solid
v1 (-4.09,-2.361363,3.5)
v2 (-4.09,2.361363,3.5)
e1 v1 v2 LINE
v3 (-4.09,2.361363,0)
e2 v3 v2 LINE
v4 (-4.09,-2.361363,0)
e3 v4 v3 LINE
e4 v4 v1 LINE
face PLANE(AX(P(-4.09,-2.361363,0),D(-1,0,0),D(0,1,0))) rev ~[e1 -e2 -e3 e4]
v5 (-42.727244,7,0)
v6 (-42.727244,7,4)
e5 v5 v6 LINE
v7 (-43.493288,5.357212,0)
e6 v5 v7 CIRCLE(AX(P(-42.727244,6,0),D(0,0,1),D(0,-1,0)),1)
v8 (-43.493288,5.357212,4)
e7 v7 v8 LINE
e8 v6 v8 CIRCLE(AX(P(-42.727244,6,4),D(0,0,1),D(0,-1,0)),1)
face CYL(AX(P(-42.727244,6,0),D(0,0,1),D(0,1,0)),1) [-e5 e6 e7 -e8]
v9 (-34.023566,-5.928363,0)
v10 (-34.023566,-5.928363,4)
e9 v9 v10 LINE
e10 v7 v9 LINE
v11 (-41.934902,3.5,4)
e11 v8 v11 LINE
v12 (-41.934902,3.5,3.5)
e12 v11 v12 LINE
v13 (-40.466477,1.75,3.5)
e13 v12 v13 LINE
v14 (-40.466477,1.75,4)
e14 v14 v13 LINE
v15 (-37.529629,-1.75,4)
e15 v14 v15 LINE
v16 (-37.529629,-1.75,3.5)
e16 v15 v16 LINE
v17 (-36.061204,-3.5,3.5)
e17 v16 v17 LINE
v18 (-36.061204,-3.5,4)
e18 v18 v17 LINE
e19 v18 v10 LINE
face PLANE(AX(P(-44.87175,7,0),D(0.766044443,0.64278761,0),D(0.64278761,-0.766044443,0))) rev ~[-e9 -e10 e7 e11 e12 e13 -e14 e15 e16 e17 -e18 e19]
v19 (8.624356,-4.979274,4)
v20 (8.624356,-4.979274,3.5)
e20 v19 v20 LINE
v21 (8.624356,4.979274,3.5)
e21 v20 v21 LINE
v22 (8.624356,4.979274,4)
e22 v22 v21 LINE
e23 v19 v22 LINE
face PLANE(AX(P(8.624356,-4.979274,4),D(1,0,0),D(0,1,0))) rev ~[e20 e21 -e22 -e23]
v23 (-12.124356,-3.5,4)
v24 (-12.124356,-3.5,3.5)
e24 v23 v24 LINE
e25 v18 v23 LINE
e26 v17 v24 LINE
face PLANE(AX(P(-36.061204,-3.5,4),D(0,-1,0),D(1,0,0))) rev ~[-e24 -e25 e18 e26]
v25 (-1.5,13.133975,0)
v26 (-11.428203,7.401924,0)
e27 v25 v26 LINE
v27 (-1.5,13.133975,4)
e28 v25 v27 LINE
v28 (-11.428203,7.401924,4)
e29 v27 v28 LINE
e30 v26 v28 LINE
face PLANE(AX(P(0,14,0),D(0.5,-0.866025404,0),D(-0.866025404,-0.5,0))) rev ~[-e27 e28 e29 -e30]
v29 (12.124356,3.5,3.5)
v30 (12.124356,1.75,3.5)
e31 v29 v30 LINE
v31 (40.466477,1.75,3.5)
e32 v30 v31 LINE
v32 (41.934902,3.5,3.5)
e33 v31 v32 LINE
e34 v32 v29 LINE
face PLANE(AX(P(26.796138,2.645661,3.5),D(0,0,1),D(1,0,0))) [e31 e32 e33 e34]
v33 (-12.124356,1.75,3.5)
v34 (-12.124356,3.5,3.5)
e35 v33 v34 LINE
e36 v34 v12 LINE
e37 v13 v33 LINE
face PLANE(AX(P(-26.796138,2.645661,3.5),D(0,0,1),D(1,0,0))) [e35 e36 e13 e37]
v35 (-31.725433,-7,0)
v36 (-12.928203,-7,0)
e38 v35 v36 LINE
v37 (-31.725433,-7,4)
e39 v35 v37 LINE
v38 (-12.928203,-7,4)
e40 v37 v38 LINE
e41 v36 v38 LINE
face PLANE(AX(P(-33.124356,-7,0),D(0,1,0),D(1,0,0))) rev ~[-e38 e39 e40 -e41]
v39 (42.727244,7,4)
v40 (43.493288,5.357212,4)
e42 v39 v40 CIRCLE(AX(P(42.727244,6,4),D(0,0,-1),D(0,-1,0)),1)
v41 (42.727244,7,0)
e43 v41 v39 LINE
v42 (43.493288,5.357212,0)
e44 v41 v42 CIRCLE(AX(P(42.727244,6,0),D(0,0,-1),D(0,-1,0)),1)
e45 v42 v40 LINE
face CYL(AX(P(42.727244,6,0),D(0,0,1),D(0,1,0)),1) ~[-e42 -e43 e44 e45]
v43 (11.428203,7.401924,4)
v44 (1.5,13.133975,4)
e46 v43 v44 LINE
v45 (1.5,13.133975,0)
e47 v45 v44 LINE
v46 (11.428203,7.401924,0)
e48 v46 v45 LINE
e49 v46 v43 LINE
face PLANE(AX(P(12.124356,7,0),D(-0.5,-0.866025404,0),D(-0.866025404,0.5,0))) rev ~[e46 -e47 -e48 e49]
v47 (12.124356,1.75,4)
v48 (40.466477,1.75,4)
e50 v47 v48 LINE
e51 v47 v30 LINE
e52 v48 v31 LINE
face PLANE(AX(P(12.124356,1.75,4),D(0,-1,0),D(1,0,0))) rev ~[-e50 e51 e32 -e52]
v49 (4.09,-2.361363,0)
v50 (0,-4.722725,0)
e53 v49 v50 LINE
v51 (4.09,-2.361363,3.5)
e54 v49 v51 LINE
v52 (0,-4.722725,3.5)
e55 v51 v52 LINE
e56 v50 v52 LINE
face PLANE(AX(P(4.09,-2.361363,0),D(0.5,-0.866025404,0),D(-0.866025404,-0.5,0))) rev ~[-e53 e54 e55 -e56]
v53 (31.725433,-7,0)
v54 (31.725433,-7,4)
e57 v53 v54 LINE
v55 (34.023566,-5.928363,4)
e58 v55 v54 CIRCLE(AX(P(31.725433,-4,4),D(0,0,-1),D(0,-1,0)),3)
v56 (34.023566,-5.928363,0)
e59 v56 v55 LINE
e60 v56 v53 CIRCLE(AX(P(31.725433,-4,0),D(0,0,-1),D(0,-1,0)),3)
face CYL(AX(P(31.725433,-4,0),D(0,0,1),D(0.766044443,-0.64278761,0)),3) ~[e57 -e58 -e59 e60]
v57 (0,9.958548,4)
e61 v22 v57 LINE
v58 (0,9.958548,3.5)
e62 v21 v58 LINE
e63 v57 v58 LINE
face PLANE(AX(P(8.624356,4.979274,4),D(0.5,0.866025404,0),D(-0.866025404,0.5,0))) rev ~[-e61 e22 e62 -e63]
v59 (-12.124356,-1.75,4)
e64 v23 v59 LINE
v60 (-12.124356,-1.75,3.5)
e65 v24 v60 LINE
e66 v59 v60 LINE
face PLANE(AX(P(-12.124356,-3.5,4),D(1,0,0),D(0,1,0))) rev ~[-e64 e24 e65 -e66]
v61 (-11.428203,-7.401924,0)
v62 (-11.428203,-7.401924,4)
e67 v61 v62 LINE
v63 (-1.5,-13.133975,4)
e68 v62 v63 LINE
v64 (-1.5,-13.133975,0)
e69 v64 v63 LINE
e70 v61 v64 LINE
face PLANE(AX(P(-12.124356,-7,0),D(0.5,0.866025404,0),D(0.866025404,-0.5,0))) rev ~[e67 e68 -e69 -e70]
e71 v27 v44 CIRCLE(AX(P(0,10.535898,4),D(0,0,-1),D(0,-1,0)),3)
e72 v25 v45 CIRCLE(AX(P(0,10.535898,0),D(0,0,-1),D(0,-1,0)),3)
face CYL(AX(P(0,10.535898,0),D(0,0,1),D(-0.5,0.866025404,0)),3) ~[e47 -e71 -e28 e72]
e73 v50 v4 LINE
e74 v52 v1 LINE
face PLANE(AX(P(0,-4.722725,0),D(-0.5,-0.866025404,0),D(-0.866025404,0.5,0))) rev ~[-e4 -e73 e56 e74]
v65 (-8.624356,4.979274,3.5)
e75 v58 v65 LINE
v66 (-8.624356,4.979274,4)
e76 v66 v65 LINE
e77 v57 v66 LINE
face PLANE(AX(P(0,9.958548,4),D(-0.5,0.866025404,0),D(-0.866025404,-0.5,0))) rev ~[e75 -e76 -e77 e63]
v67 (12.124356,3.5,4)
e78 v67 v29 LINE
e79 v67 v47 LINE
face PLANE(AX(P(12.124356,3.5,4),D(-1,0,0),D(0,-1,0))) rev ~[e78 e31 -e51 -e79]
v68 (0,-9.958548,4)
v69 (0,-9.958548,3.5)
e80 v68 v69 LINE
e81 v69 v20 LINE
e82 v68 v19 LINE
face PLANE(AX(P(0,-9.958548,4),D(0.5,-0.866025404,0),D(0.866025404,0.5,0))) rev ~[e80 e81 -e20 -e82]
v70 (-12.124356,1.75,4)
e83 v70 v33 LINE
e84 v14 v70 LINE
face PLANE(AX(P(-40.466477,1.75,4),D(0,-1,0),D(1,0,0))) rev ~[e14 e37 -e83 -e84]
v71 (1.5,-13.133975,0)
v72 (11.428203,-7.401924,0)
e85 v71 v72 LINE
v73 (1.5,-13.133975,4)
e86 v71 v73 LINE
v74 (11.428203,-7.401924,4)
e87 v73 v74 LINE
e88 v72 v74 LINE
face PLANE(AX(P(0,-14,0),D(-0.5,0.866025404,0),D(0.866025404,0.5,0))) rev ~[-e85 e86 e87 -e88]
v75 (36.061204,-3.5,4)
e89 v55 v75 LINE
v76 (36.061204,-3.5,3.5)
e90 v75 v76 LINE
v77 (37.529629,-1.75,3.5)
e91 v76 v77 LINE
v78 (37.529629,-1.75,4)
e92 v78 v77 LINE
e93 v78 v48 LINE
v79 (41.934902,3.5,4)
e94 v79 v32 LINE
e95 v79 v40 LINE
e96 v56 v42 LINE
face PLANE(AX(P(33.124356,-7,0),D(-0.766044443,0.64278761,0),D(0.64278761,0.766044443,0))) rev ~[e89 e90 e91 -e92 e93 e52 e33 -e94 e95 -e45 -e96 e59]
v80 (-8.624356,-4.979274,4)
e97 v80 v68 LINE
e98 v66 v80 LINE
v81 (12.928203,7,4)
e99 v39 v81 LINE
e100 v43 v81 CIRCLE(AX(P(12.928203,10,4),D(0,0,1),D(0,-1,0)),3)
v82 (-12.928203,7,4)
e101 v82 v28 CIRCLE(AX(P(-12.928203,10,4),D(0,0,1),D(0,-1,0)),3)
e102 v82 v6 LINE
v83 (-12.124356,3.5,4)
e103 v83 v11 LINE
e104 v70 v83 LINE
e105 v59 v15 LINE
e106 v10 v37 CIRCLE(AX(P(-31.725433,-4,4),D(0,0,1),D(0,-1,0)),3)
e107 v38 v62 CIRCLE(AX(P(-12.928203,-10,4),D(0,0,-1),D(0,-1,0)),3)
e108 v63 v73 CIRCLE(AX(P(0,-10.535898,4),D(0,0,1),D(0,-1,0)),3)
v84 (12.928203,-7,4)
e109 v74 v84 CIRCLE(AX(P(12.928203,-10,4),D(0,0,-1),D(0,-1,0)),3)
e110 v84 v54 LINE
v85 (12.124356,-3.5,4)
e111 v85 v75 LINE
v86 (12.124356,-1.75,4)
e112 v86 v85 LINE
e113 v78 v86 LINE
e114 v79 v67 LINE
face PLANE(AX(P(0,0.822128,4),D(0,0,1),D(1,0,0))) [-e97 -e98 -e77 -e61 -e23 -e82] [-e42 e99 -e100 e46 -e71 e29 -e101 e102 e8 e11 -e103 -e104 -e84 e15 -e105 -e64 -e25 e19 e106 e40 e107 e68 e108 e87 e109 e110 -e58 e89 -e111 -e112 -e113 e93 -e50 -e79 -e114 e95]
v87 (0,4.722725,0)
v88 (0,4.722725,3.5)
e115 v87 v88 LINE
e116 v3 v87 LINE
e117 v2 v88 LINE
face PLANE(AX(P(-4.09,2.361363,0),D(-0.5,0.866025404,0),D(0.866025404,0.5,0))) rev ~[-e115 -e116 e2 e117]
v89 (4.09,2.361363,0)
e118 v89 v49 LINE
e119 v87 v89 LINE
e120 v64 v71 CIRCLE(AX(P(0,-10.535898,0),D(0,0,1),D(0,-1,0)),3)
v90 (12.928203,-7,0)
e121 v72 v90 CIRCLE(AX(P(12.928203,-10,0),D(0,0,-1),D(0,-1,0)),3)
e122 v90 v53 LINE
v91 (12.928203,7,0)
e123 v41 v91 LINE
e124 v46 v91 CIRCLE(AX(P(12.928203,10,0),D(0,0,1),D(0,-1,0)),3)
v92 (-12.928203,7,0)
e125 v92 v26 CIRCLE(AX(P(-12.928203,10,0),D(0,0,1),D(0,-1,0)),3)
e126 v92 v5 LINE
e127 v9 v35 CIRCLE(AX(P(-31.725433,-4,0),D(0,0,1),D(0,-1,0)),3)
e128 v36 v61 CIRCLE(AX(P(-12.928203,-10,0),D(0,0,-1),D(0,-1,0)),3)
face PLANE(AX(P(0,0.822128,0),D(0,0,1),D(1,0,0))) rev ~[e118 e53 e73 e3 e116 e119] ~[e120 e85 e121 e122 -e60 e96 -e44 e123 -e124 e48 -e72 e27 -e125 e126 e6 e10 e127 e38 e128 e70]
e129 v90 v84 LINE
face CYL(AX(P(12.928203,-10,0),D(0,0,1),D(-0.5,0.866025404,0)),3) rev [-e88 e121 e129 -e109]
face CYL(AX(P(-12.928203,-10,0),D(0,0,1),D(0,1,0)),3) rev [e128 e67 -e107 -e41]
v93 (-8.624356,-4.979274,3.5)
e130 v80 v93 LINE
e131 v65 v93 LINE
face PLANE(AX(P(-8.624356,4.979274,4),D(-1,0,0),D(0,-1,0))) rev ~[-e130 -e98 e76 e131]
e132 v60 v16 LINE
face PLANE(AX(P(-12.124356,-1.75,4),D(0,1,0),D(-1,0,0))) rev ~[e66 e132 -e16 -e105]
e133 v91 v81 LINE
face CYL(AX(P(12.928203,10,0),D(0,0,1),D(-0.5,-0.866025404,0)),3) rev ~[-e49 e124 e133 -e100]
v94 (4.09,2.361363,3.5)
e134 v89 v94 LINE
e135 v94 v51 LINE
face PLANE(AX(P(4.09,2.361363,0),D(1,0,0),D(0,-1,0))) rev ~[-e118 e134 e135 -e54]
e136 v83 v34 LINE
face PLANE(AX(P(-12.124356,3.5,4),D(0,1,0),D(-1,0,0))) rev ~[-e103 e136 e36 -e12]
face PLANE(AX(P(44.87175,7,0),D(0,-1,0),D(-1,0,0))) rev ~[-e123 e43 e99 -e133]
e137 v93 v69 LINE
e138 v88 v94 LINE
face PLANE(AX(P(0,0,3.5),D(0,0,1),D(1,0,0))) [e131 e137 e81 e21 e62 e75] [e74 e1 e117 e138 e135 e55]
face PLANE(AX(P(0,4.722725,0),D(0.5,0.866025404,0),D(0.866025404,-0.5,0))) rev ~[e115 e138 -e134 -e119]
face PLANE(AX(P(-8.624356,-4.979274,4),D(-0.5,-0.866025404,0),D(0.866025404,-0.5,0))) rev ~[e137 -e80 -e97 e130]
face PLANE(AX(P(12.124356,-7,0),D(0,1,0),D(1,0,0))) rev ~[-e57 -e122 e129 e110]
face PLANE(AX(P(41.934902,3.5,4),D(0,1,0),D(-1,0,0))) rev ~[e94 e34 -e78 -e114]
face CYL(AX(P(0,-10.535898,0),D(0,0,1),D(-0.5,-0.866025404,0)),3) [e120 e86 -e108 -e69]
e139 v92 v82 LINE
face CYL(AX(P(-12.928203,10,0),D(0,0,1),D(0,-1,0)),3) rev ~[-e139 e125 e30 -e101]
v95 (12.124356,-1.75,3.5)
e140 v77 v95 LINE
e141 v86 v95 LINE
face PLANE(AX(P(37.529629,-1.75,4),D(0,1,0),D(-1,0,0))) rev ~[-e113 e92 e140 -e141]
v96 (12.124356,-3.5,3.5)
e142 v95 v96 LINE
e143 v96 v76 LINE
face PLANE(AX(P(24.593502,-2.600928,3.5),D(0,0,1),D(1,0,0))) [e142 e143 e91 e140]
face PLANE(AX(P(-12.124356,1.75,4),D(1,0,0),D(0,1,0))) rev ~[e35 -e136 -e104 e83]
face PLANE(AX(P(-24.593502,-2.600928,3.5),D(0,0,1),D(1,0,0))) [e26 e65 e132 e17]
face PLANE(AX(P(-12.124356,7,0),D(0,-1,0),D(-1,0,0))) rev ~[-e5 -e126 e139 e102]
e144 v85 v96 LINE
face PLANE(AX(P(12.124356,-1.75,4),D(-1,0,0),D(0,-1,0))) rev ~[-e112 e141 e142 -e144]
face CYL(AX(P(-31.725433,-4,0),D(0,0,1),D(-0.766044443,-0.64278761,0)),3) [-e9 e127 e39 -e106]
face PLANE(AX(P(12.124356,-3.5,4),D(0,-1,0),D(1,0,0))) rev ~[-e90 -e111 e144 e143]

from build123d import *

# Parameters (mm, degrees)
F1_DEPTH = 4
F2_R     = 1
F3_R     = 3
F5_DEPTH = 0.5


with BuildPart() as f1:
    # F0 (on Top) → F1 (new body)
    with BuildSketch(Plane.XY):
        Polygon((-12.124355653, 7), (-30.1414284285, 7), (-44.8717504895, 7), (-33.124355653, -7), (-12.124355653, -7), (0, -14), (12.124355653, -7), (33.124355653, -7), (44.8717504895, 7), (30.1414284285, 7), (12.124355653, 7), (0, 14), align=None)
        Polygon((4.09, 2.361362601), (4.09, -2.361362601), (0, -4.722725202), (-4.09, -2.361362601), (-4.09, 2.361362601), (0, 4.722725202), align=None, mode=Mode.SUBTRACT)
    extrude(amount=F1_DEPTH)

    # F2
    f2_edges = [f1.edges().sort_by_distance(p)[0] for p in [
        (-44.87175, 7, 2),
        (44.87175, 7, 2),
    ]]
    fillet(f2_edges, radius=F2_R)

    # F3
    f3_edges = [f1.edges().sort_by_distance(p)[0] for p in [
        (-33.124356, -7, 2),
        (-12.124356, -7, 2),
        (12.124356, -7, 2),
        (12.124356, 7, 2),
        (-12.124356, 7, 2),
        (0, -14, 2),
        (0, 14, 2),
        (33.124356, -7, 2),
    ]]
    fillet(f3_edges, radius=F3_R)

    # F4 (on face) → F5 (cut)
    with BuildSketch(Plane.XY.offset(4)):
        Polygon((0, -9.9585481157), (8.624355653, -4.9792740578), (8.624355653, 4.9792740578), (0, 9.9585481157), (-8.624355653, 4.9792740578), (-8.624355653, -4.9792740578), align=None)
        Polygon((4.09, 2.361362601), (4.09, -2.361362601), (0, -4.722725202), (-4.09, -2.361362601), (-4.09, 2.361362601), (0, 4.722725202), align=None, mode=Mode.SUBTRACT)
        Polygon((-12.124355653, 3.5), (-41.9349017803, 3.5), (-40.4664774258, 1.75), (-12.124355653, 1.75), align=None)
        Polygon((-12.124355653, -1.75), (-37.5296287167, -1.75), (-36.0612043621, -3.5), (-12.124355653, -3.5), align=None)
        Polygon((12.124355653, 3.5), (12.124355653, 1.75), (40.4664774258, 1.75), (41.9349017803, 3.5), align=None)
        Polygon((36.0612043621, -3.5), (37.5296287167, -1.75), (12.124355653, -1.75), (12.124355653, -3.5), align=None)
    extrude(amount=-F5_DEPTH, mode=Mode.SUBTRACT)


solid = f1.part
